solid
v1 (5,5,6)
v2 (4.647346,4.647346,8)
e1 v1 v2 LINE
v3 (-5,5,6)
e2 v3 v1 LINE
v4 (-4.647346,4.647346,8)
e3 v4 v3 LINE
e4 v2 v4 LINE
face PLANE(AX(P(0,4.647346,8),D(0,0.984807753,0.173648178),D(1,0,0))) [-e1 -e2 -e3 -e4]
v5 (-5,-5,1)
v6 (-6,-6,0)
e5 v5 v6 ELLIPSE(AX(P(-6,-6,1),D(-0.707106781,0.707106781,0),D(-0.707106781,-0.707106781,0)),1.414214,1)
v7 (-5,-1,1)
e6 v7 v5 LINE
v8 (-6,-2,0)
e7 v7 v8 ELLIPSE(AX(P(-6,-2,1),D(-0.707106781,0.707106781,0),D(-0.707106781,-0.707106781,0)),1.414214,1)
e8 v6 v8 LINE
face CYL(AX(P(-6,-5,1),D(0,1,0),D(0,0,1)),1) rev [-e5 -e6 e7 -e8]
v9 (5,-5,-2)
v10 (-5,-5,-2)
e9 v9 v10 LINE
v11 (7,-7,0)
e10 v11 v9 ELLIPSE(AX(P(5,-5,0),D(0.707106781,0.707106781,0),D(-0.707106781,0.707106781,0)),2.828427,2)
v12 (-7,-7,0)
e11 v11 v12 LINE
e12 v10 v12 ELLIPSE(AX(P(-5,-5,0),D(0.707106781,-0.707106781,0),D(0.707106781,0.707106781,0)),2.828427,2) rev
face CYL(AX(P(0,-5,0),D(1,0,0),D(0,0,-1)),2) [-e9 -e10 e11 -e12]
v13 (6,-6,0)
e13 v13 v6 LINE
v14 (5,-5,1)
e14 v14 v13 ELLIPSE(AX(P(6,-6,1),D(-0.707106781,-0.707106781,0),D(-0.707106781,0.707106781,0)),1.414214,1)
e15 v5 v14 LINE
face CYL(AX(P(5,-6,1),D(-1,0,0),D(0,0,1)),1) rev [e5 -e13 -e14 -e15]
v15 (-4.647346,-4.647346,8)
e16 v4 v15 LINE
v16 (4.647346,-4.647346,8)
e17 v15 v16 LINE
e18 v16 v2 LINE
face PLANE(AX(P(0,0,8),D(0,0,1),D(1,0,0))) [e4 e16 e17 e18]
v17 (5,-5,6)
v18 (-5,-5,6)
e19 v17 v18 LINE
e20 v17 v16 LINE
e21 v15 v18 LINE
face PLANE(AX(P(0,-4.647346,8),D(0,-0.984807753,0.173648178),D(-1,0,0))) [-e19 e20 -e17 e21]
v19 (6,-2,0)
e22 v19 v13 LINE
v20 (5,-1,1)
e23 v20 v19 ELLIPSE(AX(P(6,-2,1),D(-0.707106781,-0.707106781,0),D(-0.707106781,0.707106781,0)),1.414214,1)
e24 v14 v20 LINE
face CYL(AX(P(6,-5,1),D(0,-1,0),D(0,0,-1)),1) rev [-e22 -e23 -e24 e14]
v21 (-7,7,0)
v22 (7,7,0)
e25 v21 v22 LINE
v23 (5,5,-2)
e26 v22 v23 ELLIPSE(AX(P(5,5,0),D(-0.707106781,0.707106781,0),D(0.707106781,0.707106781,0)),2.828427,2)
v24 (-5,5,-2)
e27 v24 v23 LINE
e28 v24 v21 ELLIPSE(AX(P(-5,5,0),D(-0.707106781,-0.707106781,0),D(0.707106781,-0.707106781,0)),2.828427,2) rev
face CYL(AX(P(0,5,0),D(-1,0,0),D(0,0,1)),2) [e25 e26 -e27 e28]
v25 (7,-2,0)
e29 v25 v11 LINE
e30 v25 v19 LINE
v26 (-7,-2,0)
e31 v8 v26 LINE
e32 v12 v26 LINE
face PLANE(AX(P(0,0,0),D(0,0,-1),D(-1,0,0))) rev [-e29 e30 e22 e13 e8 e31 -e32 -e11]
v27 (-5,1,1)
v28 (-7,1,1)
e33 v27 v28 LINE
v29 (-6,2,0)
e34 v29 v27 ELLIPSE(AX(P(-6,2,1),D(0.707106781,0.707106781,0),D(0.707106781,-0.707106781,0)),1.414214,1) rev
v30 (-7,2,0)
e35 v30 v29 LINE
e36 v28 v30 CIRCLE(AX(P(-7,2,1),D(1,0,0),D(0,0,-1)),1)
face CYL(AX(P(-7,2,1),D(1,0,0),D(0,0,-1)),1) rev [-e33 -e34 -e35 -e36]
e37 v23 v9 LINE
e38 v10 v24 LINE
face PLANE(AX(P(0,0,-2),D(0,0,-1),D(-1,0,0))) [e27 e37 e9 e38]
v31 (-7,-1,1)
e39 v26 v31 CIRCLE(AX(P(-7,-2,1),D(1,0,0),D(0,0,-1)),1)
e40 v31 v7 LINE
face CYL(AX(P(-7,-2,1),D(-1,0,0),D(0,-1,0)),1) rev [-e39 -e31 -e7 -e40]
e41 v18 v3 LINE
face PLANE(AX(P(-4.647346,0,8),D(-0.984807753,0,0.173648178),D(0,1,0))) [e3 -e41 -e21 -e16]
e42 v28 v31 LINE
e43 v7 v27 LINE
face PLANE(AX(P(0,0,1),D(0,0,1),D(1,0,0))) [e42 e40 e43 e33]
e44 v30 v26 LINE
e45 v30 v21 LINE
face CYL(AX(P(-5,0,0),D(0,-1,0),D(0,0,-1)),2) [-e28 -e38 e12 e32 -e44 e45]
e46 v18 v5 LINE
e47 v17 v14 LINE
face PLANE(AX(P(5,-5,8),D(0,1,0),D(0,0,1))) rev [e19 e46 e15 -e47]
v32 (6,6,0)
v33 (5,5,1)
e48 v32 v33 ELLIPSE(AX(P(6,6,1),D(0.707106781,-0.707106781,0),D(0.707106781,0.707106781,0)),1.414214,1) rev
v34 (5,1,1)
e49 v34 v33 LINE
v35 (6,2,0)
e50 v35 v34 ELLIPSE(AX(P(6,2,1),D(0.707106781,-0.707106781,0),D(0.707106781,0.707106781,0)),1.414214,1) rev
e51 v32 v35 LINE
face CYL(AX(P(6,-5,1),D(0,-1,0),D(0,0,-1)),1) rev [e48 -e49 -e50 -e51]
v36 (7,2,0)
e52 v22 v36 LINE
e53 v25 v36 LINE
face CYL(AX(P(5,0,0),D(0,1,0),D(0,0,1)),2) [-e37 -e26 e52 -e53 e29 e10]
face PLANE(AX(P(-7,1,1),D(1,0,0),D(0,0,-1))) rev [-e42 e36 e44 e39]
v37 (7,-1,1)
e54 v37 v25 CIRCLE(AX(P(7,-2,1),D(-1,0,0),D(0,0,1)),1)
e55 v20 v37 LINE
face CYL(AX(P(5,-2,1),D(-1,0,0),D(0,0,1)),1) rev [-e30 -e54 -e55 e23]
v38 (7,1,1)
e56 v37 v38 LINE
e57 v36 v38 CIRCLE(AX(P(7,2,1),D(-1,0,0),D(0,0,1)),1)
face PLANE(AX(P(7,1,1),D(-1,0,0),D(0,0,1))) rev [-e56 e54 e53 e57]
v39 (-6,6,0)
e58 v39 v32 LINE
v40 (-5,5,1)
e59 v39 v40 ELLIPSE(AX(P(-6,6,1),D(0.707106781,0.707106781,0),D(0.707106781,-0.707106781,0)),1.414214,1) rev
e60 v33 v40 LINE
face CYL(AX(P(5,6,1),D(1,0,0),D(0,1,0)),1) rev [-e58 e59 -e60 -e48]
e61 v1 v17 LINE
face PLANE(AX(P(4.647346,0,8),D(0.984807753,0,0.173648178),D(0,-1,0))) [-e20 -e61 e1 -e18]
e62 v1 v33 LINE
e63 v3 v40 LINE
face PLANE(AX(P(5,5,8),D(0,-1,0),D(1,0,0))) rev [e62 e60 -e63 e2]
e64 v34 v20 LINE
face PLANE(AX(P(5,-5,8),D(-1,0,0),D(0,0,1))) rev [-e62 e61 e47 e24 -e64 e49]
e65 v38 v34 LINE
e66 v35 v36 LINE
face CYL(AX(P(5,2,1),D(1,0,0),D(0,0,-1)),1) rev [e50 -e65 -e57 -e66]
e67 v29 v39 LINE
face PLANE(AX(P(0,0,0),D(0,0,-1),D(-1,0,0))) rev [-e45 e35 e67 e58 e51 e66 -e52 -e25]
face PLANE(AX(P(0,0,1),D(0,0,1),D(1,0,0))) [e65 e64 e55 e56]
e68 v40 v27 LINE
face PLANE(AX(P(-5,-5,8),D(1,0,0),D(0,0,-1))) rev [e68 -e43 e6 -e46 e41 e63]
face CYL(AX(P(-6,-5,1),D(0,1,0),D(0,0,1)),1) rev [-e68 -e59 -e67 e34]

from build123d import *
from OCP.BRepFilletAPI import BRepFilletAPI_MakeChamfer

# Parameters (mm, degrees)
SKETCH1_W           = 10
SKETCH1_H           = 10
BOSS_EXTRUDE1_DEPTH = 8
SKETCH2_W           = 14
SKETCH2_H           = 14
BOSS_EXTRUDE2_DEPTH = 2
FILLET1_R           = 2
CHAMFER1_SIZE       = 2
CHAMFER1_SIZE2      = 0.352653961
SKETCH3_W           = 2
SKETCH3_H           = 2
BOSS_EXTRUDE3_DEPTH = 1
FILLET2_R           = 1


with BuildPart() as part:
    # Sketch1 → Boss-Extrude1 (new body)
    with BuildSketch(Plane.XY):
        Rectangle(SKETCH1_W, SKETCH1_H)
    extrude(amount=BOSS_EXTRUDE1_DEPTH)

    # Sketch2 → Boss-Extrude2 (add)
    with BuildSketch(Plane(origin=(0, 0, 0), x_dir=(-1, 0, 0), z_dir=(0, 0, -1))):
        Rectangle(SKETCH2_W, SKETCH2_H)
    extrude(amount=BOSS_EXTRUDE2_DEPTH)

    # Fillet1
    fillet1_edges = [part.edges().sort_by_distance(p)[0] for p in [
        (0, 7, -2),
        (-7, 0, -2),
        (0, -7, -2),
        (7, 0, -2),
    ]]
    fillet(fillet1_edges, radius=FILLET1_R - 0.0001)  # a hair under: the kernel refuses the full size

    # Chamfer1: one chamfer whose edges measure the first distance from different faces: ONE call of the kernel's chamfer builder (chamfer() names one face for all edges)
    chamfer1_edges_1 = [part.edges().sort_by_distance(p)[0] for p in [
        (5, 0, 8),
    ]]
    chamfer1_side_1 = [part.faces().sort_by_distance(p)[0] for p in [
        (5, 0, 4),
    ]]
    chamfer1_edges_2 = [part.edges().sort_by_distance(p)[0] for p in [
        (0, 5, 8),
    ]]
    chamfer1_side_2 = [part.faces().sort_by_distance(p)[0] for p in [
        (0, 5, 4),
    ]]
    chamfer1_edges_3 = [part.edges().sort_by_distance(p)[0] for p in [
        (-5, 0, 8),
    ]]
    chamfer1_side_3 = [part.faces().sort_by_distance(p)[0] for p in [
        (-5, 0, 4),
    ]]
    chamfer1_edges_4 = [part.edges().sort_by_distance(p)[0] for p in [
        (0, -5, 8),
    ]]
    chamfer1_side_4 = [part.faces().sort_by_distance(p)[0] for p in [
        (0, -5, 4),
    ]]
    chamfer1 = BRepFilletAPI_MakeChamfer(part.part.solid().wrapped)
    for e in chamfer1_edges_1:
        chamfer1.Add(CHAMFER1_SIZE, CHAMFER1_SIZE2, e.wrapped, chamfer1_side_1[0].wrapped)  # the first distance lies on this face
    for e in chamfer1_edges_2:
        chamfer1.Add(CHAMFER1_SIZE, CHAMFER1_SIZE2, e.wrapped, chamfer1_side_2[0].wrapped)  # the first distance lies on this face
    for e in chamfer1_edges_3:
        chamfer1.Add(CHAMFER1_SIZE, CHAMFER1_SIZE2, e.wrapped, chamfer1_side_3[0].wrapped)  # the first distance lies on this face
    for e in chamfer1_edges_4:
        chamfer1.Add(CHAMFER1_SIZE, CHAMFER1_SIZE2, e.wrapped, chamfer1_side_4[0].wrapped)  # the first distance lies on this face
    add(Compound.cast(chamfer1.Shape()), mode=Mode.REPLACE)

    # Sketch3 → Boss-Extrude3 (add)
    with BuildSketch(Plane.XY):
        with Locations((-6, 0)):
            Rectangle(SKETCH3_W, SKETCH3_H)
        with Locations((6, 0)):
            Rectangle(SKETCH3_W, SKETCH3_H)
    extrude(amount=BOSS_EXTRUDE3_DEPTH)

    # Fillet2
    fillet2_edges = [part.edges().sort_by_distance(p)[0] for p in [
        (6, 1, 0),
        (6, -1, 0),
        (-6, -1, 0),
        (-6, 1, 0),
        (5, 3, 0),
        (5, -3, 0),
        (-5, 3, 0),
        (-5, -3, 0),
        (0, 5, 0),
        (0, -5, 0),
    ]]
    fillet(fillet2_edges, radius=FILLET2_R - 0.0001)  # a hair under: the kernel refuses the full size


solid = part.part
